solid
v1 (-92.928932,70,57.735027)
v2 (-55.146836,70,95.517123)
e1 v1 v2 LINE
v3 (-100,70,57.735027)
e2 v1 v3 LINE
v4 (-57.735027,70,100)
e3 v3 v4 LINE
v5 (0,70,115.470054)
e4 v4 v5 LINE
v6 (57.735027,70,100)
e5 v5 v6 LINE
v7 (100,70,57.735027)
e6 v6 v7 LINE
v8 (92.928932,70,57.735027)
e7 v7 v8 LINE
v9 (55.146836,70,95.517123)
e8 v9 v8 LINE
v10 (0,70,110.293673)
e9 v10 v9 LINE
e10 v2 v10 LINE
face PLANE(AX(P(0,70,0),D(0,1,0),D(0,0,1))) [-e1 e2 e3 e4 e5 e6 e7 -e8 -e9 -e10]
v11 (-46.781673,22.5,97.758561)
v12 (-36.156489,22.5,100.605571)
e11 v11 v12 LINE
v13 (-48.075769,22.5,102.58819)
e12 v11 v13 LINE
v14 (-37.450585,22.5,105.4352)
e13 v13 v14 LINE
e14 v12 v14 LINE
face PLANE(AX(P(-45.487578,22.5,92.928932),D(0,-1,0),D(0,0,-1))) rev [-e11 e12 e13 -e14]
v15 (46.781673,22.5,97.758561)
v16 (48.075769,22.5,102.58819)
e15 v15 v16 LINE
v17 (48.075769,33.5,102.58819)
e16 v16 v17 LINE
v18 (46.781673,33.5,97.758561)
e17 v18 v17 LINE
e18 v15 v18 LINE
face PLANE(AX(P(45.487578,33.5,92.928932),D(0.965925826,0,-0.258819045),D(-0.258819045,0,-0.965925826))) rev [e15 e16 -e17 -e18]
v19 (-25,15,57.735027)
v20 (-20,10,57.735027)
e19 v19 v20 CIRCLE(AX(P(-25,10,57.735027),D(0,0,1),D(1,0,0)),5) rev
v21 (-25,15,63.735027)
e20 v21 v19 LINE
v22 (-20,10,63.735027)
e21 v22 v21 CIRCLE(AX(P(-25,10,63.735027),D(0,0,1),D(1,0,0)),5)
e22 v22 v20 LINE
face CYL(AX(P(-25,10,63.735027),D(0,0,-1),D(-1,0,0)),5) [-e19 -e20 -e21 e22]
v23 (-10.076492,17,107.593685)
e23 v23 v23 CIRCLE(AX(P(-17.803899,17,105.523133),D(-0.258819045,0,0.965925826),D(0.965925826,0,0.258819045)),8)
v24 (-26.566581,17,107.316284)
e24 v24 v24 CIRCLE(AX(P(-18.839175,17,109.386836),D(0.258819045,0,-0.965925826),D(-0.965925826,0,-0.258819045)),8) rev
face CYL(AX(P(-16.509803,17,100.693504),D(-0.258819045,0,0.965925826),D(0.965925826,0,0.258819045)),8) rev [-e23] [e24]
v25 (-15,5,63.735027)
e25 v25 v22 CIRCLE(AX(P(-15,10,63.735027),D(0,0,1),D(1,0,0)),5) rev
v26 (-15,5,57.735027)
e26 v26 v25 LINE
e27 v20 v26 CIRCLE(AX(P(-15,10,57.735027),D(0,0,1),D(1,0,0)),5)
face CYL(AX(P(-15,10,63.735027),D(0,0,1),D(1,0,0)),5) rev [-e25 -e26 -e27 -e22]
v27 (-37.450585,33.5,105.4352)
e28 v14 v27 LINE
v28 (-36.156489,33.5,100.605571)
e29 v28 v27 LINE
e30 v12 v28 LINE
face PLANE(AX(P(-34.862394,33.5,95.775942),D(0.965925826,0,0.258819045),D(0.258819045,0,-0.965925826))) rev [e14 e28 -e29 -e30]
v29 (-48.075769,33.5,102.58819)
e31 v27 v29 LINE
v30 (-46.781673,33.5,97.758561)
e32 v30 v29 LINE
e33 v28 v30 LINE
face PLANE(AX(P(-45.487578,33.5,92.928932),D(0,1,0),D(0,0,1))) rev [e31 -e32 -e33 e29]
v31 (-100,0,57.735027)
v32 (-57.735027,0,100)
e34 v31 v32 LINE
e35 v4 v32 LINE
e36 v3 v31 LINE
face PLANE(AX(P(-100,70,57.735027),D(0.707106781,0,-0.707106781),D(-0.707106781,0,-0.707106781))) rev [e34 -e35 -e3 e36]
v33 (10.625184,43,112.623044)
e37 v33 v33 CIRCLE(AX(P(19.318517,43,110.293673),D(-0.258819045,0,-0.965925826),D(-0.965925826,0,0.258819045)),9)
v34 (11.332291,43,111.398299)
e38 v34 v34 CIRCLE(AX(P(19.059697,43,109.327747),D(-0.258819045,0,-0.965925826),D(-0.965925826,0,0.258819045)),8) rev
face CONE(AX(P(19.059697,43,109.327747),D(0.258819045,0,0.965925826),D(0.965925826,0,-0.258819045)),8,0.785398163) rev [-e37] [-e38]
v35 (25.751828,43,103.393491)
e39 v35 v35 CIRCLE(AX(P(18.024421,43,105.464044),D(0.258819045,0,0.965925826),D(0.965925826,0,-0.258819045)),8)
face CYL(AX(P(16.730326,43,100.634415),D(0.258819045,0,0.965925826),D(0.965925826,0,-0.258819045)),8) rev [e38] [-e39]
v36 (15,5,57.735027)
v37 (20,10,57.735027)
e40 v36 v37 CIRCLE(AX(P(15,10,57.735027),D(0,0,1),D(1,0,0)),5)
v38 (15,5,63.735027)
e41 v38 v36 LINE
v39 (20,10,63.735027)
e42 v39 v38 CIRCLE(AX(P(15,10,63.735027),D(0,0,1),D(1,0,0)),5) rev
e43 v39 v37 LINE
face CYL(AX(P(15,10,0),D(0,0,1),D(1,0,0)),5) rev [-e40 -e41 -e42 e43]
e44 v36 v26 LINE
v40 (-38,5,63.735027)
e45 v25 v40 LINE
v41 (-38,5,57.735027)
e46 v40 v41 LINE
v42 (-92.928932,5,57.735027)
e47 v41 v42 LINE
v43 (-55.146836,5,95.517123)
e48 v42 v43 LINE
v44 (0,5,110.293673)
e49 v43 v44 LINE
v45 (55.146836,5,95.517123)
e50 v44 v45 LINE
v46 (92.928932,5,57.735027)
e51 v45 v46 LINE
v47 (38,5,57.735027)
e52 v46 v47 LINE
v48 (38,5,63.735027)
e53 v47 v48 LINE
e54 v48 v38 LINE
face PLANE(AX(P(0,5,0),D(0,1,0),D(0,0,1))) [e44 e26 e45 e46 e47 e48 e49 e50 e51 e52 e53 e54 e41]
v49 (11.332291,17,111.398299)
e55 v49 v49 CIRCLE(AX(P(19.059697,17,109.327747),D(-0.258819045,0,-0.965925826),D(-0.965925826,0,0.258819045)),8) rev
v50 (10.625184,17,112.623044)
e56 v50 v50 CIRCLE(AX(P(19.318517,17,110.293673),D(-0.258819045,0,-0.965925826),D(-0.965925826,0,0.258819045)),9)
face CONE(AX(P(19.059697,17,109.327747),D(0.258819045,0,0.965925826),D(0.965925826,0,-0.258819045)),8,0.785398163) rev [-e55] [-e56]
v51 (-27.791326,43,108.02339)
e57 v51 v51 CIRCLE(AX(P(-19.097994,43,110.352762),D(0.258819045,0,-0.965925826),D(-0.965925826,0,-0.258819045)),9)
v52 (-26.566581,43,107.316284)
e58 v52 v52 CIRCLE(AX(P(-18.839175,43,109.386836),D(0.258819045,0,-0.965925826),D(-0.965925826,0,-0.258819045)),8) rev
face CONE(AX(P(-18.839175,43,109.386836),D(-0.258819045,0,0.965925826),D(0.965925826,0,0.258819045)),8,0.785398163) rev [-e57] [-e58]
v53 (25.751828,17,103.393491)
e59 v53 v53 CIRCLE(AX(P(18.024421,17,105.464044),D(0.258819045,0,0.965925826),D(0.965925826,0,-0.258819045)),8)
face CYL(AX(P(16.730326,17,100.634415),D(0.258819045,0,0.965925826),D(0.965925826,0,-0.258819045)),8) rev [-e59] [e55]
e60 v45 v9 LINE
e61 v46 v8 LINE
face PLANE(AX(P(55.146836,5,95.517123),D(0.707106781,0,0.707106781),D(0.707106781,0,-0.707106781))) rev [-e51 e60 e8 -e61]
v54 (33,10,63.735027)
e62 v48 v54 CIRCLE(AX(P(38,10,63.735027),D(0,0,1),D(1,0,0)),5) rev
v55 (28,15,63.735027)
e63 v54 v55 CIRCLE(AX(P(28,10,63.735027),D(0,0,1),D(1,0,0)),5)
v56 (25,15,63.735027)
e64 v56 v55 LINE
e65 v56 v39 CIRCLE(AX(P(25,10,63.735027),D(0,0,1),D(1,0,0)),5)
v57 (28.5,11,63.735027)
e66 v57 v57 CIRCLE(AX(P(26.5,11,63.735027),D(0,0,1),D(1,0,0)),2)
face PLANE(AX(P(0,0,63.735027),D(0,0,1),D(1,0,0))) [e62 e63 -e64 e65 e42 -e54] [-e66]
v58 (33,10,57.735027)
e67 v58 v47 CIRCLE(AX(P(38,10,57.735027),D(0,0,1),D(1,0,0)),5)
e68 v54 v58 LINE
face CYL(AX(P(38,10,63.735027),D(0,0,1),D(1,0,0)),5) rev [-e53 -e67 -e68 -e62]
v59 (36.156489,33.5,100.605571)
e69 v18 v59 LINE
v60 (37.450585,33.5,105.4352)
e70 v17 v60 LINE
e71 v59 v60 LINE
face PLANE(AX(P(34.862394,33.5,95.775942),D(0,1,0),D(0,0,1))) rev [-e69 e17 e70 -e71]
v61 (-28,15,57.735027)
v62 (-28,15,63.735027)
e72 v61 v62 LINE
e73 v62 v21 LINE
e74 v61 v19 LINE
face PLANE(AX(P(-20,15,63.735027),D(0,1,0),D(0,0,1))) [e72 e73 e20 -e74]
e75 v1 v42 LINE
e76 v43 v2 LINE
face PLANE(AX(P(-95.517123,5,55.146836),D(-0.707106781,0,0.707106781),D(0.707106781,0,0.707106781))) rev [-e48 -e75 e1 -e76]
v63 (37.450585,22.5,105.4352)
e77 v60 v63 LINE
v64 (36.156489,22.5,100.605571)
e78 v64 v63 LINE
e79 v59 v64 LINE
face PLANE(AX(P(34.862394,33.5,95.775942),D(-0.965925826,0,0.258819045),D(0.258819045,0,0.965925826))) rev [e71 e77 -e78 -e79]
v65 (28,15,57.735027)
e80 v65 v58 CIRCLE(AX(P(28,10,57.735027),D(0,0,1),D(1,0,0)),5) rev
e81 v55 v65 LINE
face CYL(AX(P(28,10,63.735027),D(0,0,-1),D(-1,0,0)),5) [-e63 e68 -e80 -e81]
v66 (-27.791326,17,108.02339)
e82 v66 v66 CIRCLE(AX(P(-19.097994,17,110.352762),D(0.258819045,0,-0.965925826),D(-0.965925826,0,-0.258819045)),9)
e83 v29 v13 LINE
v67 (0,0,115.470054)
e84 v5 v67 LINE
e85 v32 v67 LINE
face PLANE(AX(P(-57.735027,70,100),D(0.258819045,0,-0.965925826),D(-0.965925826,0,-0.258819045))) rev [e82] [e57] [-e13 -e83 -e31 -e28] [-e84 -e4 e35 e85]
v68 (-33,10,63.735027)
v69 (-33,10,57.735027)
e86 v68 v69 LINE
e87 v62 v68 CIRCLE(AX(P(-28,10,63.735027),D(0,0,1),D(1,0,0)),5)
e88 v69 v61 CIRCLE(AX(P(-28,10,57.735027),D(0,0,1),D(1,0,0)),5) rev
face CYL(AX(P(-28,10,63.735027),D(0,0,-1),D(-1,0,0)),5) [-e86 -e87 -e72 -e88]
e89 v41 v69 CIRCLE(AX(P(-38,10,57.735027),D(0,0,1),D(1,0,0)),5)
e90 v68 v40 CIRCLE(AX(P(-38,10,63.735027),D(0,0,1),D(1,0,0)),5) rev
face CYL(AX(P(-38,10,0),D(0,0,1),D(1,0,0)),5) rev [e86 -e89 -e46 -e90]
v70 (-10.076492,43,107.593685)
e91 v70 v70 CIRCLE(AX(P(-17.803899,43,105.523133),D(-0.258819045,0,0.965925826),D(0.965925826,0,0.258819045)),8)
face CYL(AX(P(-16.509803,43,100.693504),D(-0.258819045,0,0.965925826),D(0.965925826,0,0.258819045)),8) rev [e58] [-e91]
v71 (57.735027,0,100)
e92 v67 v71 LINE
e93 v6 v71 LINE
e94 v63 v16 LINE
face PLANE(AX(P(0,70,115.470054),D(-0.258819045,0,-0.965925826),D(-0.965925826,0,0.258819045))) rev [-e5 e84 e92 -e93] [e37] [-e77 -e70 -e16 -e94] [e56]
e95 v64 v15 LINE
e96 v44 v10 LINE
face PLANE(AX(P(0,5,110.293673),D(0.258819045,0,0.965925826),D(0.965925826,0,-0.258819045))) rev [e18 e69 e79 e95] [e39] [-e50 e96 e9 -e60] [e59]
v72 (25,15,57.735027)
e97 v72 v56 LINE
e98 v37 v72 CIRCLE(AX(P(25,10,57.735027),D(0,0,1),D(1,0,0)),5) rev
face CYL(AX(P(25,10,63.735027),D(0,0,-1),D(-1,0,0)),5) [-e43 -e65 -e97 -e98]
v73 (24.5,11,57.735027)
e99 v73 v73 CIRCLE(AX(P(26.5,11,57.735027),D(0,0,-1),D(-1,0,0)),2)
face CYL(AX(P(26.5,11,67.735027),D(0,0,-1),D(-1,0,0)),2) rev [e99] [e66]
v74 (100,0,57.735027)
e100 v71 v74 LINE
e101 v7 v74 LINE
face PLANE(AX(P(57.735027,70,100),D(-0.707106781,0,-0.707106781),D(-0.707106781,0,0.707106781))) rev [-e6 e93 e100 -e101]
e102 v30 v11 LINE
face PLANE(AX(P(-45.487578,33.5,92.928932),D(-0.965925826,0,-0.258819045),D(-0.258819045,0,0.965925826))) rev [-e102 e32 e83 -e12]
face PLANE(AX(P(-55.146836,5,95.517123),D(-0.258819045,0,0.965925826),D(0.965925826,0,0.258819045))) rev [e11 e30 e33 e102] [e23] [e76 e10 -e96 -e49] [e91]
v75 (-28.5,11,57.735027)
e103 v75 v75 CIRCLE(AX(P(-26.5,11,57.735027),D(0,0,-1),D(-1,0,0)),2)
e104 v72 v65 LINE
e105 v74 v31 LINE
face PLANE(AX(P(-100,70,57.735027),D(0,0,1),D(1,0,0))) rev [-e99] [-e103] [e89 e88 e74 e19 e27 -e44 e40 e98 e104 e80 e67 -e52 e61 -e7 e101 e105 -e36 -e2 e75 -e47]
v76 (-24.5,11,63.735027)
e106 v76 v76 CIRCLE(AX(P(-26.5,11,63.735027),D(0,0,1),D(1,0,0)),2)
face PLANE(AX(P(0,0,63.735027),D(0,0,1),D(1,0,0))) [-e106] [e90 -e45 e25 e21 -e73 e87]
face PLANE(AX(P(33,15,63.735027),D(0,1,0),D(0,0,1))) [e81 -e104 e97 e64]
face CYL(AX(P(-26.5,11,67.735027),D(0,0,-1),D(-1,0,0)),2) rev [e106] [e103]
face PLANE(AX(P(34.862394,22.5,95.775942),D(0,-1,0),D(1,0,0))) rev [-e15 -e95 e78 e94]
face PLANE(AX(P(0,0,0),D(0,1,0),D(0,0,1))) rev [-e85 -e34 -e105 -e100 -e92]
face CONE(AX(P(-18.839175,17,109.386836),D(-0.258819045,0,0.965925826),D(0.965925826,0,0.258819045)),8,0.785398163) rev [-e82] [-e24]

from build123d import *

# Parameters (mm, degrees)
BOSS_EXTRUDE1_DEPTH = 70
CUT_EXTRUDE1_DEPTH  = 65
SKETCH5_R           = 8
CUT_EXTRUDE2_DEPTH  = 10
SKETCH6_R           = 8
CUT_EXTRUDE3_DEPTH  = 10
CHAMFER2_SIZE       = 1
SKETCH7_W           = 11
SKETCH7_H           = 11
CUT_EXTRUDE4_DEPTH  = 10
SKETCH8_W           = 11
SKETCH8_H           = 11
CUT_EXTRUDE5_DEPTH  = 10
SKETCH9_W           = 13
SKETCH9_H           = 10
BOSS_EXTRUDE2_DEPTH = 6
SKETCH10_R          = 2
CUT_EXTRUDE6_DEPTH  = 10
FILLET1_R           = 5


with BuildPart() as part:
    # Sketch1 → Boss-Extrude1 (new body)
    with BuildSketch(Plane(origin=(0, 0, 0), x_dir=(1, 0, 0), z_dir=(0, 1, 0))):
        Polygon((57.735026919, -100), (100, -57.735026919), (-100, -57.735026919), (-57.735026919, -100), (0, -115.470053838), align=None)
    extrude(amount=BOSS_EXTRUDE1_DEPTH)

    # Sketch4 → Cut-Extrude1 (cut)
    with BuildSketch(Plane(origin=(0, 70, 0), x_dir=(1, 0, 0), z_dir=(0, 1, 0))):
        Polygon((110.293672936, 0), (95.517122639, 55.146836468), (55.146836468, 95.517122639), (0, 110.293672936), (-55.146836468, 95.517122639), (-95.517122639, 55.146836468), (-110.293672936, 0), (-95.517122639, -55.146836468), (-55.146836468, -95.517122639), (0, -110.293672936), (55.146836468, -95.517122639), (95.517122639, -55.146836468), align=None)
    extrude(amount=-CUT_EXTRUDE1_DEPTH, mode=Mode.SUBTRACT)

    # Sketch5 → Cut-Extrude2 (cut)
    with BuildSketch(Plane(origin=(-28.867513459, 0, 107.735026919), x_dir=(0.9659258262890683, 0, 0.25881904510252085), z_dir=(-0.2588190451025208, 0, 0.9659258262890682))):
        with Locations((10.114150928, 43)):
            Circle(SKETCH5_R)
        with Locations((10.114150928, 17)):
            Circle(SKETCH5_R)
    extrude(amount=-CUT_EXTRUDE2_DEPTH, mode=Mode.SUBTRACT)

    # Sketch6 → Cut-Extrude3 (cut)
    with BuildSketch(Plane(origin=(28.867513459, 0, 107.735026919), x_dir=(0.9659258262890683, 0, -0.25881904510252085), z_dir=(0.2588190451025208, 0, 0.9659258262890682))):
        with Locations((-9.885849072, 17)):
            Circle(SKETCH6_R)
        with Locations((-9.885849072, 43)):
            Circle(SKETCH6_R)
    extrude(amount=-CUT_EXTRUDE3_DEPTH, mode=Mode.SUBTRACT)

    # Chamfer2
    chamfer2_edges = [part.edges().sort_by_distance(p)[0] for p in [
        (-26.825400478, 43, 108.282209443),
        (-26.825400478, 17, 108.282209443),
        (11.591109915, 17, 112.364225297),
        (11.591109915, 43, 112.364225297),
    ]]
    chamfer(chamfer2_edges, length=CHAMFER2_SIZE)

    # Sketch7 → Cut-Extrude4 (cut)
    with BuildSketch(Plane(origin=(-28.867513459, 0, 107.735026919), x_dir=(0.9659258262890683, 0, 0.25881904510252085), z_dir=(-0.2588190451025208, 0, 0.9659258262890682))):
        with Locations((-14.385849072, 28)):
            Rectangle(SKETCH7_W, SKETCH7_H)
    extrude(amount=-CUT_EXTRUDE4_DEPTH, mode=Mode.SUBTRACT)

    # Sketch8 → Cut-Extrude5 (cut)
    with BuildSketch(Plane(origin=(28.867513459, 0, 107.735026919), x_dir=(0.9659258262890683, 0, -0.25881904510252085), z_dir=(0.2588190451025208, 0, 0.9659258262890682))):
        with Locations((14.385849072, 28)):
            Rectangle(SKETCH8_W, SKETCH8_H)
    extrude(amount=-CUT_EXTRUDE5_DEPTH, mode=Mode.SUBTRACT)

    # Sketch9 → Boss-Extrude2 (add)
    with BuildSketch(Plane(origin=(0, 0, 57.735026919), x_dir=(-1, 0, 0), z_dir=(0, 0, -1))):
        with Locations((-26.5, 10)):
            Rectangle(SKETCH9_W, SKETCH9_H)
        with Locations((26.5, 10)):
            Rectangle(SKETCH9_W, SKETCH9_H)
    extrude(amount=-BOSS_EXTRUDE2_DEPTH)

    # Sketch10 → Cut-Extrude6 (cut)
    with BuildSketch(Plane(origin=(0, 0, 57.735026919), x_dir=(-1, 0, 0), z_dir=(0, 0, -1))):
        with Locations((-26.5, 11)):
            Circle(SKETCH10_R)
        with Locations((26.5, 11)):
            Circle(SKETCH10_R)
    extrude(amount=-CUT_EXTRUDE6_DEPTH, mode=Mode.SUBTRACT)

    # Fillet1
    fillet1_edges = [part.edges().sort_by_distance(p)[0] for p in [
        (-33, 5, 60.735026919),
        (-20, 5, 60.735026919),
        (20, 5, 60.735026919),
        (33, 5, 60.735026919),
    ]]
    fillet(fillet1_edges, radius=FILLET1_R)
    fillet1_2_edges = [part.edges().sort_by_distance(p)[0] for p in [
        (-33, 15, 60.735026919),
        (-20, 15, 60.735026919),
        (20, 15, 60.735026919),
        (33, 15, 60.735026919),
    ]]
    fillet(fillet1_2_edges, radius=FILLET1_R - 0.0001)  # a hair under: the kernel refuses the full size


solid = part.part
